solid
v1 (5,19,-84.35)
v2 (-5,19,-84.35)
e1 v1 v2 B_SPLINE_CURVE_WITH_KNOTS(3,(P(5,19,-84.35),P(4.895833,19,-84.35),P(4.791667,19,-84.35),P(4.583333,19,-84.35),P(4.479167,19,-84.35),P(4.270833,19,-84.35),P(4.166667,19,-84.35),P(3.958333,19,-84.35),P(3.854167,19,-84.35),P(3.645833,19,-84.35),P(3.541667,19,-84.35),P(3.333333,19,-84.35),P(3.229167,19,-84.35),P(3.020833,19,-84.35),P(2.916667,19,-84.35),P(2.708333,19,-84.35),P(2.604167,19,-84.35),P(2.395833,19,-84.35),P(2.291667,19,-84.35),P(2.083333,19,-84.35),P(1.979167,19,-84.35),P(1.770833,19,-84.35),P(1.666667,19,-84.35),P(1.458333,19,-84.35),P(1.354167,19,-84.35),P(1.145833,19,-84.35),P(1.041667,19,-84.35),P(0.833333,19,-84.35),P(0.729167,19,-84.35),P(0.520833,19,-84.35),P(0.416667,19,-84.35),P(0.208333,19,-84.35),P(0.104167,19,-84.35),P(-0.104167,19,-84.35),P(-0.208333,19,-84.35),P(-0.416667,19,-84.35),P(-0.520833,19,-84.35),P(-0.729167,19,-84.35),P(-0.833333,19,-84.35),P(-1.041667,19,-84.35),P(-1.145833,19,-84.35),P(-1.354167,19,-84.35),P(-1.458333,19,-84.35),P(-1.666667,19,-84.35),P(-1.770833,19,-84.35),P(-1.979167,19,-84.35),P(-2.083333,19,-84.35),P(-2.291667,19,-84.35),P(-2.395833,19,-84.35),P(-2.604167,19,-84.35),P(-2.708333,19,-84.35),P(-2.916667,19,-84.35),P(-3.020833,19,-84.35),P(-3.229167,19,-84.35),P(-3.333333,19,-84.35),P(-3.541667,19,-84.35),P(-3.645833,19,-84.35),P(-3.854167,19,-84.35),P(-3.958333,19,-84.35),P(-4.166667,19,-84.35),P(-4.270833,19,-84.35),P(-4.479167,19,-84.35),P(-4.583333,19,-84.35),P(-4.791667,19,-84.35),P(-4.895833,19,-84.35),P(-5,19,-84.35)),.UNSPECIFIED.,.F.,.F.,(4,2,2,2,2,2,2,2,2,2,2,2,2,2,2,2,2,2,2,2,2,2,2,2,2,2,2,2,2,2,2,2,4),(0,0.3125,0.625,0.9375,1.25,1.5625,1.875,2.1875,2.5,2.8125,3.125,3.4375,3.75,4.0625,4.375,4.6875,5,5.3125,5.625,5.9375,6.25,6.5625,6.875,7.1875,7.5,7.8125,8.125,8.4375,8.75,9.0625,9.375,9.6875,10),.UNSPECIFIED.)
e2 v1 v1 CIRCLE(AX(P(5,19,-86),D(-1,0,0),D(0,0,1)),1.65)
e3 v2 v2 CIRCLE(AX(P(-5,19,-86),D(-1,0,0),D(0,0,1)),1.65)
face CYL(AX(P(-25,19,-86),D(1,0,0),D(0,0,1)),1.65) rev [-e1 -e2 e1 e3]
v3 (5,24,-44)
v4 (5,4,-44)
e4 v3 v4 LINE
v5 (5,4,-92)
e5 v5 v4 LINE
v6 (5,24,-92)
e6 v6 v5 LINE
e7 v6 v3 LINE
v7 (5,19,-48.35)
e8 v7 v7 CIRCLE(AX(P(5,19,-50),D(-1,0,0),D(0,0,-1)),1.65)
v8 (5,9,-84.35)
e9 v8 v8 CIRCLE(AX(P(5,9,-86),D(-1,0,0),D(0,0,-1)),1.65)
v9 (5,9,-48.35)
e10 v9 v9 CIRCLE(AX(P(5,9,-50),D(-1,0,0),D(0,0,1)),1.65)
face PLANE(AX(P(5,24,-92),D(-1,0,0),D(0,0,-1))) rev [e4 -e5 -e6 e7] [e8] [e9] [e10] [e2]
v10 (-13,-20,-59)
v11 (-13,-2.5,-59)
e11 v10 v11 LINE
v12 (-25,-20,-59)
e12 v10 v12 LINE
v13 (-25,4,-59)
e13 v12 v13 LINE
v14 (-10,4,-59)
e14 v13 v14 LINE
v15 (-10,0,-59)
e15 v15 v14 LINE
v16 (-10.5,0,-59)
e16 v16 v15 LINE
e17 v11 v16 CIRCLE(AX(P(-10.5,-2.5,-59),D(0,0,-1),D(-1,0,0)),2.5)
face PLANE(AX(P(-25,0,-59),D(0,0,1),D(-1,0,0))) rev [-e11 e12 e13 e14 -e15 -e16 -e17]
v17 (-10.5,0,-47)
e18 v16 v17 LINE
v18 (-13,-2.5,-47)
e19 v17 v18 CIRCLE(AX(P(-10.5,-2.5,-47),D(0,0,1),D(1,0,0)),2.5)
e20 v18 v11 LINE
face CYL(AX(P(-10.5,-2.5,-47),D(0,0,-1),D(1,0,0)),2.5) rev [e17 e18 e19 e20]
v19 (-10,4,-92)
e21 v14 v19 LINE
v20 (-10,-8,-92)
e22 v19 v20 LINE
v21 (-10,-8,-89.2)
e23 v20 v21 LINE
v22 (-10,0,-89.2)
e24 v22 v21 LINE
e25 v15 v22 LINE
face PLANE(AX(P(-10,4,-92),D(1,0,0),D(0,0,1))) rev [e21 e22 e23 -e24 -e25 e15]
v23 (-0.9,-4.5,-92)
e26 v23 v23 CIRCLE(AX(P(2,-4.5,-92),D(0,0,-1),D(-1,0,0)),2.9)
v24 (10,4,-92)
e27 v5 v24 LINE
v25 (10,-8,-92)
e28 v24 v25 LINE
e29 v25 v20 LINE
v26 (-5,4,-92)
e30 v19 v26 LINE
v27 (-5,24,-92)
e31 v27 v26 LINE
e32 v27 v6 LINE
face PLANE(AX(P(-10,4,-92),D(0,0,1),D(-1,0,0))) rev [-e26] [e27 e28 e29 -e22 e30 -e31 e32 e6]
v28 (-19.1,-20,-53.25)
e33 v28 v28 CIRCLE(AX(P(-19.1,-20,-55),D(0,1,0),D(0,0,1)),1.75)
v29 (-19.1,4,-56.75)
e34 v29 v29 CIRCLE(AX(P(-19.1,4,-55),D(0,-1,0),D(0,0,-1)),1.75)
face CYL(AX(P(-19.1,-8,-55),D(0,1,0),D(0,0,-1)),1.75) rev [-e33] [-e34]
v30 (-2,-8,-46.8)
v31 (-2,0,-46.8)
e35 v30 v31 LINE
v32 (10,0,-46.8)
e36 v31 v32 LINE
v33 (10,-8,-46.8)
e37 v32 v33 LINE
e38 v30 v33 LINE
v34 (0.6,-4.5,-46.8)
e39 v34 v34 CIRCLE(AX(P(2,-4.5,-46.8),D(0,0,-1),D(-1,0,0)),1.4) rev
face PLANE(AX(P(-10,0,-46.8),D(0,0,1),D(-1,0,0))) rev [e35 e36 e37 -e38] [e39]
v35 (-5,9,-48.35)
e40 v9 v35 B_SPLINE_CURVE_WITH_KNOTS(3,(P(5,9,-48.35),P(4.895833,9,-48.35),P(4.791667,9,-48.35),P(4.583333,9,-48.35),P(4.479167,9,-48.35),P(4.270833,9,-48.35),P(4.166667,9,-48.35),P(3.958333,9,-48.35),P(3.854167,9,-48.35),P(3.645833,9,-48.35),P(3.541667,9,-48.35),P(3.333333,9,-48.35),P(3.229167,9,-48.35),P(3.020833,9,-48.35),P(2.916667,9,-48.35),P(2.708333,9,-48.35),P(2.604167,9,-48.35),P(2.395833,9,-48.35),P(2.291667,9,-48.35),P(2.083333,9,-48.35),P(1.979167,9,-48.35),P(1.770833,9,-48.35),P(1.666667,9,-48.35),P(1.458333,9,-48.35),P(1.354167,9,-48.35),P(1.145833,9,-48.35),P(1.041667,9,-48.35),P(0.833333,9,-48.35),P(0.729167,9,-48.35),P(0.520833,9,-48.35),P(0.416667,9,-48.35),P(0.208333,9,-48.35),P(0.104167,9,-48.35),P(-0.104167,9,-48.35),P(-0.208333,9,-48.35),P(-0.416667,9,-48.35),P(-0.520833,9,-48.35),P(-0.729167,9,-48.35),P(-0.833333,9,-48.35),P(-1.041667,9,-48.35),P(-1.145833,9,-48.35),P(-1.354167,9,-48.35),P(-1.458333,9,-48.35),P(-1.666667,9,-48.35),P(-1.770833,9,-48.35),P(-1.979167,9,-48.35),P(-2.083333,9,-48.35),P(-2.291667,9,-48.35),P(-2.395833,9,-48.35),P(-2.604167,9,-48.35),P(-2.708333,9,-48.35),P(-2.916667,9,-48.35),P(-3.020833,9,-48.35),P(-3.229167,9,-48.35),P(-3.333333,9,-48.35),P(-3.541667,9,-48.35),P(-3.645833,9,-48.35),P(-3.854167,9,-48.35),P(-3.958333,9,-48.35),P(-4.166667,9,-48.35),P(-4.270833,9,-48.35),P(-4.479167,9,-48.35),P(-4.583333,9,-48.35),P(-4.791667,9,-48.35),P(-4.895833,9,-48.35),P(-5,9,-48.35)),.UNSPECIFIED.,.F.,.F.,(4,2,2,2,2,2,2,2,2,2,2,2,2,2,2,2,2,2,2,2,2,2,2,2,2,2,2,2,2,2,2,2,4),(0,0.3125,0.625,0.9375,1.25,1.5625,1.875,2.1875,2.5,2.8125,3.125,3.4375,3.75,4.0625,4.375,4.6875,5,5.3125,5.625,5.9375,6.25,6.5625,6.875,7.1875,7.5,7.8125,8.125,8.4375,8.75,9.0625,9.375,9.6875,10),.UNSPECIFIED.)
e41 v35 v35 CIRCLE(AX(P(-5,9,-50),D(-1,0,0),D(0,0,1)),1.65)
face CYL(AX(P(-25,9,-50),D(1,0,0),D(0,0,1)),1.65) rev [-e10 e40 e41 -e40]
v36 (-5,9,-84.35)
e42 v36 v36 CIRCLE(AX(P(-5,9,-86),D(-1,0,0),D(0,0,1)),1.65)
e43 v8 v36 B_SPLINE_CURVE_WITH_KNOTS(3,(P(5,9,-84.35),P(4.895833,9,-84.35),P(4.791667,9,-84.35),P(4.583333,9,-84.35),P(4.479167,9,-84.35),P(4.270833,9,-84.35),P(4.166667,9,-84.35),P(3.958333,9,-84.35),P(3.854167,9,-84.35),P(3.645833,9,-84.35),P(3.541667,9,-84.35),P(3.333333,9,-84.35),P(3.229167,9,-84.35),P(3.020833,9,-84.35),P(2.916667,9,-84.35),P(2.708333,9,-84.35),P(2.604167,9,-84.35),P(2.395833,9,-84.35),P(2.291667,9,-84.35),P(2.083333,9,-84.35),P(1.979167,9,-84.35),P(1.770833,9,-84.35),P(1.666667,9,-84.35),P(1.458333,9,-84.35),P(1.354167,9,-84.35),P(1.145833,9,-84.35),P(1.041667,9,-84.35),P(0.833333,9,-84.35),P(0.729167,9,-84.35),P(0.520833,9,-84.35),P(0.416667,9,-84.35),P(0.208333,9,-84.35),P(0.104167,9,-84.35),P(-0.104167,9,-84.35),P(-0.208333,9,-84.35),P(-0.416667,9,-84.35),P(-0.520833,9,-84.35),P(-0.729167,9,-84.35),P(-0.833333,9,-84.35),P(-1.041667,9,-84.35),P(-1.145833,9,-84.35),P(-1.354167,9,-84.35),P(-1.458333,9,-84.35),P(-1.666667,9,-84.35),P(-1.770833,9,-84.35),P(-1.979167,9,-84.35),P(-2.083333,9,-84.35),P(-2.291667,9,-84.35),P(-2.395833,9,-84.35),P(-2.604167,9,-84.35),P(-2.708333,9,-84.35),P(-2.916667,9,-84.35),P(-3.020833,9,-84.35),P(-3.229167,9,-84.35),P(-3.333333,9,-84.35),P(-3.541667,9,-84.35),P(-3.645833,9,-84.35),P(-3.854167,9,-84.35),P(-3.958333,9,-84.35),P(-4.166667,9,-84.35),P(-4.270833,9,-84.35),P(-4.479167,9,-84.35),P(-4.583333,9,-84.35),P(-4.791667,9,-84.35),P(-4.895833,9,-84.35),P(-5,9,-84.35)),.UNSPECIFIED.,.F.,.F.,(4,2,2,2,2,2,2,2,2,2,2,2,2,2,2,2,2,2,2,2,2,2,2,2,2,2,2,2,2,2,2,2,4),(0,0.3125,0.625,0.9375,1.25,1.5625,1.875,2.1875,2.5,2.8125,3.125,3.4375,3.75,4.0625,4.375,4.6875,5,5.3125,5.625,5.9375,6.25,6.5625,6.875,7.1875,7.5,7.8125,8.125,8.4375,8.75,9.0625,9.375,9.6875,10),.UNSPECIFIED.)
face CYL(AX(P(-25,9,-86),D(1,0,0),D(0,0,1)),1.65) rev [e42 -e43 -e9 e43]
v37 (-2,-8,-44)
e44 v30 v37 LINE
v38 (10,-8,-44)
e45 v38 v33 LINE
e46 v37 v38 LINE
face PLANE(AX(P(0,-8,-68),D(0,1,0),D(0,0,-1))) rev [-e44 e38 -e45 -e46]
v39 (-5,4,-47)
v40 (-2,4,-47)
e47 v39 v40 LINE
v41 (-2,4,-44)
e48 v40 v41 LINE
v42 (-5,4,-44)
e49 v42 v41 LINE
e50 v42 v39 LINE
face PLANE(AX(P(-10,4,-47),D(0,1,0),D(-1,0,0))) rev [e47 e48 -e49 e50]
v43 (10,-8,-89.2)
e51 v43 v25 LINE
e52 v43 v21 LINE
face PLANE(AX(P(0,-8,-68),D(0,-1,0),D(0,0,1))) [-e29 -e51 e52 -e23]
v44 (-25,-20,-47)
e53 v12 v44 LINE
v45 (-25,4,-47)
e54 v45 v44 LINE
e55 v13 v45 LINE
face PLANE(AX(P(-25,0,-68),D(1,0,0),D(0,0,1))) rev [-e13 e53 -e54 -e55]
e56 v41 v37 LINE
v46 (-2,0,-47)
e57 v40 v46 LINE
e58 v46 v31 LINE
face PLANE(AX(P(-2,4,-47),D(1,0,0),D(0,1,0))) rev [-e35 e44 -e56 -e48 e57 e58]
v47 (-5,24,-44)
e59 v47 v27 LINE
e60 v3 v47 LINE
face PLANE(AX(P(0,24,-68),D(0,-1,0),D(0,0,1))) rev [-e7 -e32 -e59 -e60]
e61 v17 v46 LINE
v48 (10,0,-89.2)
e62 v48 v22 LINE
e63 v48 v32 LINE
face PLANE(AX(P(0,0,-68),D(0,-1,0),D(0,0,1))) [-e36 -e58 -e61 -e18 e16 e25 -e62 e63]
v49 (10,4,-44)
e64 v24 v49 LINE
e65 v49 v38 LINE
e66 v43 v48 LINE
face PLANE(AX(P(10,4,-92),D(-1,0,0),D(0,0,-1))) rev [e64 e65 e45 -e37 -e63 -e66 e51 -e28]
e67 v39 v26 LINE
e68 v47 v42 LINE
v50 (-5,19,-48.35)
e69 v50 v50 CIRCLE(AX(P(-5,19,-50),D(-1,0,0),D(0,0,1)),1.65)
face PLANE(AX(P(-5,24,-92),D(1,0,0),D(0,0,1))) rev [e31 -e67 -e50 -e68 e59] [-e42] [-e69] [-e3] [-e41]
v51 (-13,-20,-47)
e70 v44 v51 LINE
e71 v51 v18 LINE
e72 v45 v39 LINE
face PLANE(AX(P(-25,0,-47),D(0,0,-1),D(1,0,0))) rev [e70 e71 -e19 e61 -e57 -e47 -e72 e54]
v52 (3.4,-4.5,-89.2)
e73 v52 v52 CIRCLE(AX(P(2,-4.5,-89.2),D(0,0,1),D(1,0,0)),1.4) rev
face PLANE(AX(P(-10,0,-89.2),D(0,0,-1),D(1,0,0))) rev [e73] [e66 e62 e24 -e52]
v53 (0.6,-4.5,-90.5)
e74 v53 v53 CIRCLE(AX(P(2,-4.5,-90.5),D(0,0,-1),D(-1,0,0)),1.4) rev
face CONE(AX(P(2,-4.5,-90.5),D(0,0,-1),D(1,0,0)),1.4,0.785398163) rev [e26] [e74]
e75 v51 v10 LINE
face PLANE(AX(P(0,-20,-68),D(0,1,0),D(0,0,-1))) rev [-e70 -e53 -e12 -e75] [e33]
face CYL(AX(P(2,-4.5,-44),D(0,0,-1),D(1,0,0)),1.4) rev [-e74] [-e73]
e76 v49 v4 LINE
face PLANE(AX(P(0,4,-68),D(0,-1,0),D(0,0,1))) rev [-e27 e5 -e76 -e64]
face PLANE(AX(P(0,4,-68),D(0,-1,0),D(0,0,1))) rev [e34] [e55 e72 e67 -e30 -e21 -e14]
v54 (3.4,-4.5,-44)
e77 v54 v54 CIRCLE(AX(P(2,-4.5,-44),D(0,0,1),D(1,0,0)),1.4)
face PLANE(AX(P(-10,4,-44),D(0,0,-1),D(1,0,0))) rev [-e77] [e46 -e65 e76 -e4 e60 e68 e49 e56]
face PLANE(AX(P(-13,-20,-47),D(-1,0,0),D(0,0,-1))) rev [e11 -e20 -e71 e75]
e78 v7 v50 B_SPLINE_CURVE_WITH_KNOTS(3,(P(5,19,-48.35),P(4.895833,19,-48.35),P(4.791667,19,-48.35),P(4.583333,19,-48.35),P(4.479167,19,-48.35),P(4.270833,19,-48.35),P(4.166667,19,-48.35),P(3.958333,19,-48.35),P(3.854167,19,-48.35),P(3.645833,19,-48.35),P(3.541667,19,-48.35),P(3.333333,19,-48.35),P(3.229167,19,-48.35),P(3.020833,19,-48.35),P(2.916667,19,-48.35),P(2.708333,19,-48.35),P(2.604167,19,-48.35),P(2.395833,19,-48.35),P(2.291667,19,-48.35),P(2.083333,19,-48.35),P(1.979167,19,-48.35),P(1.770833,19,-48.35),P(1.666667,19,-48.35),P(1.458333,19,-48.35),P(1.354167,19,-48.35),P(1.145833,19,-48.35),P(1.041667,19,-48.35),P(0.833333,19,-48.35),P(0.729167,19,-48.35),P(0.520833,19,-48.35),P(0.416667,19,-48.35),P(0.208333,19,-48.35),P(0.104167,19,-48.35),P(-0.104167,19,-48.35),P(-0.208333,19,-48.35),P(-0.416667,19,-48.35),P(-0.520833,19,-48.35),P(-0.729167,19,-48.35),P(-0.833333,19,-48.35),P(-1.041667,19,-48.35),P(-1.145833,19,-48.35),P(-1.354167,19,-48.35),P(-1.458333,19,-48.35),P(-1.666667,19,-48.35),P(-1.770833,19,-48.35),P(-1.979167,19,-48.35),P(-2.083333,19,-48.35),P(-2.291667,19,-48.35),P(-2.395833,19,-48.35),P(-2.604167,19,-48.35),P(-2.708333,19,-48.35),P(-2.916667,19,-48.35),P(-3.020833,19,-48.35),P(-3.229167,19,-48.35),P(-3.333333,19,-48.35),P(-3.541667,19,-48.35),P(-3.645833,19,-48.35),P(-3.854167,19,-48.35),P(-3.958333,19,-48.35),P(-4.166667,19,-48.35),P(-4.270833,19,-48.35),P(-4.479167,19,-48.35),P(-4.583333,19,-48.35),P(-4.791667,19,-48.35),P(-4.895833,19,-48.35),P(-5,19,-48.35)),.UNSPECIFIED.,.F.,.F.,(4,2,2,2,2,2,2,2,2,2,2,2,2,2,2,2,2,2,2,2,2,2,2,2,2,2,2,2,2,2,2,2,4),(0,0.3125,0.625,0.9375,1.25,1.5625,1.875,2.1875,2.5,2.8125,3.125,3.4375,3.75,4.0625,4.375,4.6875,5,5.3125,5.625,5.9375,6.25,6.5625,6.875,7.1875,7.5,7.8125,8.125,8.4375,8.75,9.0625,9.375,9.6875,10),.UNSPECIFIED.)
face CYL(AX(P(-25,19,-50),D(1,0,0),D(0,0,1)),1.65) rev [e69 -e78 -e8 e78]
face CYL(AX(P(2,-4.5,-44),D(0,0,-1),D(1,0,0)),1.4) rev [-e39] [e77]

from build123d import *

# Parameters (mm, degrees)
SKETCH_1_W          = 20
SKETCH_1_H          = 48
EXTRUDE_2_DEPTH     = 4
SKETCH_3_W          = 20
SKETCH_3_H          = 3
EXTRUDE_3_DEPTH     = 8
SKETCH_4_W          = 12
SKETCH_4_H          = 4
EXTRUDE_4_DEPTH     = 15
SKETCH_5_R          = 1.75
CUT_EXTRUDE_2_DEPTH = 37.674241642
SKETCH_6_W          = 12
SKETCH_6_H          = 12
SKETCH_6_R          = 1.75
EXTRUDE_5_DEPTH     = 20
SKETCH_7_W          = 10
SKETCH_7_H          = 48
EXTRUDE_6_DEPTH     = 20
SKETCH_8_R          = 1.65
CUT_EXTRUDE_3_DEPTH = 46.299006612
CHAMFER_1_SIZE      = 3
FILLET_2_R          = 2.5
SKETCH_11_W         = 8
SKETCH_11_H         = 12
CUT_EXTRUDE_5_DEPTH = 3
SKETCH_12_R         = 1.4
CUT_EXTRUDE_6_DEPTH = 60.203040462
CHAMFER_2_SIZE      = 1.5
SKETCH_14_W         = 21.274376693
SKETCH_14_H         = 42.4
CUT_EXTRUDE_7_DEPTH = 8
SKETCH_15_W         = 103.642401021
SKETCH_15_H         = 66.860791826
CUT_EXTRUDE_8_DEPTH = 106


with BuildPart() as part:
    # 草图1 → 凸台-拉伸2 (new body)
    with BuildSketch(Plane(origin=(0, 0, 0), x_dir=(1, 0, 0), z_dir=(0, 1, 0))):
        Rectangle(SKETCH_1_W, SKETCH_1_H)
    extrude(amount=EXTRUDE_2_DEPTH)

    # 草图3 → 凸台-拉伸3 (add)
    with BuildSketch(Plane.XZ):
        with Locations((0, 22.5)):
            Rectangle(SKETCH_3_W, SKETCH_3_H)
        with Locations((0, -22.5)):
            Rectangle(SKETCH_3_W, SKETCH_3_H)
    extrude(amount=EXTRUDE_3_DEPTH)

    # 草图4 → 凸台-拉伸4 (add)
    with BuildSketch(Plane.ZY.offset(10)):
        with Locations((-15, 2)):
            Rectangle(SKETCH_4_W, SKETCH_4_H)
    extrude(amount=EXTRUDE_4_DEPTH)

    # 草图5 → 切除-拉伸2 (cut, through all)
    with BuildSketch(Plane(origin=(0, 4, 0), x_dir=(1, 0, 0), z_dir=(0, 1, 0))):
        with Locations(Location((-19.1, 13, 0), (0, 0, 270))):
            Circle(SKETCH_5_R)
    extrude(amount=-CUT_EXTRUDE_2_DEPTH, mode=Mode.SUBTRACT)

    # 草图6 → 凸台-拉伸5 (add)
    with BuildSketch(Plane.XZ):
        with Locations((-19, -15)):
            Rectangle(SKETCH_6_W, SKETCH_6_H)
        with Locations(Location((-19.1, -13, 0), (0, 0, 90))):
            Circle(SKETCH_6_R, mode=Mode.SUBTRACT)
    extrude(amount=EXTRUDE_5_DEPTH)

    # 草图7 → 凸台-拉伸6 (add)
    with BuildSketch(Plane(origin=(0, 4, 0), x_dir=(1, 0, 0), z_dir=(0, 1, 0))):
        Rectangle(SKETCH_7_W, SKETCH_7_H)
    extrude(amount=EXTRUDE_6_DEPTH)

    # 草图8 → 切除-拉伸3 (cut, through all)
    with BuildSketch(Plane(origin=(5, 0, 0), x_dir=(0, 0, -1), z_dir=(1, 0, 0))):
        with Locations((-18, 19)):
            Circle(SKETCH_8_R)
        with Locations((18, 19)):
            Circle(SKETCH_8_R)
        with Locations((18, 9)):
            Circle(SKETCH_8_R)
        with Locations((-18, 9)):
            Circle(SKETCH_8_R)
    extrude(amount=-CUT_EXTRUDE_3_DEPTH, mode=Mode.SUBTRACT)

    # 倒角1
    chamfer_1_edges = [part.edges().sort_by_distance(p)[0] for p in [
        (-10, -2, -24),
    ]]
    chamfer(chamfer_1_edges, length=CHAMFER_1_SIZE - 0.0001)  # a hair under: the kernel refuses the full size

    # 圆角2
    fillet_2_edges = [part.edges().sort_by_distance(p)[0] for p in [
        (-13, 0, -15),
    ]]
    fillet(fillet_2_edges, radius=FILLET_2_R)

    # 草图11 → 切除-拉伸5 (cut)
    with BuildSketch(Plane(origin=(0, 0, -24), x_dir=(-1, 0, 0), z_dir=(0, 0, -1))):
        with Locations((6, -2)):
            Rectangle(SKETCH_11_W, SKETCH_11_H)
    extrude(amount=-CUT_EXTRUDE_5_DEPTH, mode=Mode.SUBTRACT)

    # 草图12 → 切除-拉伸6 (cut, through all)
    with BuildSketch(Plane.XY.offset(24)):
        with Locations((2, -4.5)):
            Circle(SKETCH_12_R)
    extrude(amount=-CUT_EXTRUDE_6_DEPTH, mode=Mode.SUBTRACT)

    # 倒角2
    chamfer_2_edges = [part.edges().sort_by_distance(p)[0] for p in [
        (0.6, -4.5, 24),
    ]]
    chamfer(chamfer_2_edges, length=CHAMFER_2_SIZE)

    # 草图14 → 切除-拉伸7 (cut)
    with BuildSketch(Plane.XZ.offset(8)):
        with Locations((0.637188347, 0)):
            Rectangle(SKETCH_14_W, SKETCH_14_H)
    extrude(amount=-CUT_EXTRUDE_7_DEPTH, mode=Mode.SUBTRACT)


with BuildPart() as body_2:
    # 镜向2: mirrored copy
    add(part.part.mirror(Plane(origin=(0, 0, -34), x_dir=(1, 0, 0), z_dir=(0, 0, -1))))


with BuildPart() as part_1:
    add(part.part)

    # 草图15 → 切除-拉伸8 (cut, through all)
    with BuildSketch(Plane(origin=(0, 24, 0), x_dir=(1, 0, 0), z_dir=(0, 1, 0))):
        with Locations((-18.895114943, 2.939974457)):
            Rectangle(SKETCH_15_W, SKETCH_15_H)
    extrude(amount=-CUT_EXTRUDE_8_DEPTH, mode=Mode.SUBTRACT)


solid = body_2.part
